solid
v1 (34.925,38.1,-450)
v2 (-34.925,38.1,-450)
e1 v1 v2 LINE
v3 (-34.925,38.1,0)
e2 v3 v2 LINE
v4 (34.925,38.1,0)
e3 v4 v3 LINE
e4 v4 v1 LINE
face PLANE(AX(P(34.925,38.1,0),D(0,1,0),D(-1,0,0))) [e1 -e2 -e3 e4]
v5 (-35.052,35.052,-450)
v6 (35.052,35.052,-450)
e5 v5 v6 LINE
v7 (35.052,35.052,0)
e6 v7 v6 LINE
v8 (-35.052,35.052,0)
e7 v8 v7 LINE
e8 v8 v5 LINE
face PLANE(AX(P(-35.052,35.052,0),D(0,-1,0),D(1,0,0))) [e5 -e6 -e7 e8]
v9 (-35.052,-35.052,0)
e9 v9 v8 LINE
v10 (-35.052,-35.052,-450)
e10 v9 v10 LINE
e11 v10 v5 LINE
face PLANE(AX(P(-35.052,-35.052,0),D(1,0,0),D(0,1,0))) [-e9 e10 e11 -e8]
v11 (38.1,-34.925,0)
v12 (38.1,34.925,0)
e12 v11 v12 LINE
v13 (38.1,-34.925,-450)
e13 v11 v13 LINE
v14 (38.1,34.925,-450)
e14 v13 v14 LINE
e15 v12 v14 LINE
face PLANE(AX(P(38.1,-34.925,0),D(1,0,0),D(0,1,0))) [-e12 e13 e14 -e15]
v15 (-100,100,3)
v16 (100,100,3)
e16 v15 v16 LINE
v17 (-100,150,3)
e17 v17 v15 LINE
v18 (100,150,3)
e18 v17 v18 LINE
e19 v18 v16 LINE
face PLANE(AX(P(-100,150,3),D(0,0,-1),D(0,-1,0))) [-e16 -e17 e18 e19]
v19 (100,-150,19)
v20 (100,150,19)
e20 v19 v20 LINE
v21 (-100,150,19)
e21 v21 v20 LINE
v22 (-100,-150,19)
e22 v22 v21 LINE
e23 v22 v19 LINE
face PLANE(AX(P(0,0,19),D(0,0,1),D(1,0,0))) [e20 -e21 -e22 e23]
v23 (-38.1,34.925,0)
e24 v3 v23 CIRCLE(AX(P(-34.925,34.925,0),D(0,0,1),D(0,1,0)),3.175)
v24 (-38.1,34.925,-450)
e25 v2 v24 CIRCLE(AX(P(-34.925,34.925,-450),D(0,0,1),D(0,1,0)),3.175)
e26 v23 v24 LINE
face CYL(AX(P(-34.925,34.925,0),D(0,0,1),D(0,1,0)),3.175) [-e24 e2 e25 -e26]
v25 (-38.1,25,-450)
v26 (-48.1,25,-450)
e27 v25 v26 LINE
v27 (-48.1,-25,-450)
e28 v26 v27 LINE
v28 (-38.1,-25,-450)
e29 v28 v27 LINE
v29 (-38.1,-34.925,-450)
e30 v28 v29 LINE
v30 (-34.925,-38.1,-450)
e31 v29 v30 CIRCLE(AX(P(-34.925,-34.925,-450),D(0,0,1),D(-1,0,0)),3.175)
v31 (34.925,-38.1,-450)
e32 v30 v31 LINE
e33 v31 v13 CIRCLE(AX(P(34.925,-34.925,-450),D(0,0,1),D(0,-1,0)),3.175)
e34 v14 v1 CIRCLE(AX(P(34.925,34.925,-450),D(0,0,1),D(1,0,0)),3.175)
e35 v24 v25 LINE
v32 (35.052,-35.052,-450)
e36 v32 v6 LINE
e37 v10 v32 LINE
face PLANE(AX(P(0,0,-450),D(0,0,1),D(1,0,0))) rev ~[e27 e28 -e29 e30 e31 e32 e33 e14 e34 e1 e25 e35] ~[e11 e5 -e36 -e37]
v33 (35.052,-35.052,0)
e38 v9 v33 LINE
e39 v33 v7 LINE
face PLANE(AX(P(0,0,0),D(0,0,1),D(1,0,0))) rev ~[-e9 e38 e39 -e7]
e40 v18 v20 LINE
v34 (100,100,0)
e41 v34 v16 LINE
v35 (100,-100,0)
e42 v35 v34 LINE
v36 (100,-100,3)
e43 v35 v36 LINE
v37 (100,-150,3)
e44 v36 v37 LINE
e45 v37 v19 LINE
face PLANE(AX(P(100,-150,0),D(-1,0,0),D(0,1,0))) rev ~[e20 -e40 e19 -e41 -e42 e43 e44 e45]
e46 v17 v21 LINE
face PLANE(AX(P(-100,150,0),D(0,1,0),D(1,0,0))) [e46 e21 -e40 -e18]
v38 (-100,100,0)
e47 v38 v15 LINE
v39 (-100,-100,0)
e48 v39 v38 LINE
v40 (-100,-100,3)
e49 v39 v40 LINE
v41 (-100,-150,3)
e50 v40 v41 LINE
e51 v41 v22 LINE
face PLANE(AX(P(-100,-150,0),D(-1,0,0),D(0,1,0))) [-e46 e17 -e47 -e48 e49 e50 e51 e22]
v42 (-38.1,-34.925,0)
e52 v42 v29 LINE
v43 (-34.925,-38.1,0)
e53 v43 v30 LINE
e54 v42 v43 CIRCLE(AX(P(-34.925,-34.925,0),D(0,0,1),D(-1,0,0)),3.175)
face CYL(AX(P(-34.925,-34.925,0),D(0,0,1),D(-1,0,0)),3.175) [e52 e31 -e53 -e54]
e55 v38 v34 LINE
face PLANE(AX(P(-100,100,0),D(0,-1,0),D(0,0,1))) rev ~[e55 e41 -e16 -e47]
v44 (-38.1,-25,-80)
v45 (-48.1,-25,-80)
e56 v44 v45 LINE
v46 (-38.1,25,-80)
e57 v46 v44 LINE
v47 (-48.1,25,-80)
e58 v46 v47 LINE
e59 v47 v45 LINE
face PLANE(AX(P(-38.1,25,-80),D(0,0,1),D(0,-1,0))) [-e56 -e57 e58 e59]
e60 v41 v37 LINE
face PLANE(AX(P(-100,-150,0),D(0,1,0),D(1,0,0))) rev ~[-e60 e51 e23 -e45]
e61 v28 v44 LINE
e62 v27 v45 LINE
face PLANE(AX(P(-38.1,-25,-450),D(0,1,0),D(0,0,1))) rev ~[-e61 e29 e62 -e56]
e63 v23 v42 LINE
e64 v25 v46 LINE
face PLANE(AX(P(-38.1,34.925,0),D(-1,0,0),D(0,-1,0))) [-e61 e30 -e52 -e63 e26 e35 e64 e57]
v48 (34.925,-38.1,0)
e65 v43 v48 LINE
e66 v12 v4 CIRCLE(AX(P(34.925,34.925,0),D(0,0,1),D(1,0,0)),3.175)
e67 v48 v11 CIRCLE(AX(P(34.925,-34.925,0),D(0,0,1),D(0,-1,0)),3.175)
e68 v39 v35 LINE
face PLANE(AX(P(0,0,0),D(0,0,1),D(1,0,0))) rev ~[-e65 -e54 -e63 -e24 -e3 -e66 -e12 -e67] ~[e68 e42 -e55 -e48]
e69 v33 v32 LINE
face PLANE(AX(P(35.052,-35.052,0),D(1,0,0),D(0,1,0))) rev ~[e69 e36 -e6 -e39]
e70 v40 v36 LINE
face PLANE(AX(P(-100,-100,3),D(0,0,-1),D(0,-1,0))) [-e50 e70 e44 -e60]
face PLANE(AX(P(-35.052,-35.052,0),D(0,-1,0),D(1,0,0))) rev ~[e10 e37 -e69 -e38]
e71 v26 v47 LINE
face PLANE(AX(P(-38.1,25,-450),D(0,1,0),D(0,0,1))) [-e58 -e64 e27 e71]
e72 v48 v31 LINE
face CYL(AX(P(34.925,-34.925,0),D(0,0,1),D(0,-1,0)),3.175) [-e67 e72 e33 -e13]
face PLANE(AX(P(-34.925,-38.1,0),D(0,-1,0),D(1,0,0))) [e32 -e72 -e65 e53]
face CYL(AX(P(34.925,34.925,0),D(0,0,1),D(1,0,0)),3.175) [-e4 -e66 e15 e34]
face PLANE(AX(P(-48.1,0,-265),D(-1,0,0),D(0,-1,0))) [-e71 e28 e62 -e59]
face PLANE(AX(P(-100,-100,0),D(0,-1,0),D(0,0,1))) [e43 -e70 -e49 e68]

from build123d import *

# Parameters (mm, degrees)
F0_W     = 70.104
F0_H     = 70.104
F1_DEPTH = 450
F2_W     = 50
F2_H     = 370
F3_DEPTH = 10
F4_W     = 200
F4_H     = 300
F5_DEPTH = 19
F6_W     = 50
F6_H     = 3
F7_DEPTH = 254


with BuildPart() as f1:
    # F0 (on Top) → F1 (new body)
    with BuildSketch(Plane.XY):
        with BuildLine():
            Line((34.925, 38.1), (-34.925, 38.1))
            ThreePointArc((-34.925, 38.1), (-37.1700640303, 37.1700640303), (-38.1, 34.925))
            Line((-38.1, 34.925), (-38.1, -34.925))
            ThreePointArc((-38.1, -34.925), (-37.1700640303, -37.1700640303), (-34.925, -38.1))
            Line((-34.925, -38.1), (34.925, -38.1))
            ThreePointArc((34.925, -38.1), (37.1700640303, -37.1700640303), (38.1, -34.925))
            Line((38.1, -34.925), (38.1, 34.925))
            ThreePointArc((38.1, 34.925), (37.1700640303, 37.1700640303), (34.925, 38.1))
        make_face()
        Rectangle(F0_W, F0_H, mode=Mode.SUBTRACT)
    extrude(amount=-F1_DEPTH)

    # F2 (on face) → F3 (join)
    with BuildSketch(Plane(origin=(-38.1, 0, 0), x_dir=(0, -1, 0), z_dir=(-1, 0, 0))):
        with Locations((0, -265)):
            Rectangle(F2_W, F2_H)
    extrude(amount=F3_DEPTH)

    # F4 (on Top) → F5 (join)
    with BuildSketch(Plane.XY):
        Rectangle(F4_W, F4_H)
    extrude(amount=F5_DEPTH)

    # F6 (on face) → F7 (cut)
    with BuildSketch(Plane(origin=(-100, 0, 0), x_dir=(0, -1, 0), z_dir=(-1, 0, 0))):
        with Locations((125, 1.5)):
            Rectangle(F6_W, F6_H)
        with Locations((-125, 1.5)):
            Rectangle(F6_W, F6_H)
    extrude(amount=-F7_DEPTH, mode=Mode.SUBTRACT)


solid = f1.part
